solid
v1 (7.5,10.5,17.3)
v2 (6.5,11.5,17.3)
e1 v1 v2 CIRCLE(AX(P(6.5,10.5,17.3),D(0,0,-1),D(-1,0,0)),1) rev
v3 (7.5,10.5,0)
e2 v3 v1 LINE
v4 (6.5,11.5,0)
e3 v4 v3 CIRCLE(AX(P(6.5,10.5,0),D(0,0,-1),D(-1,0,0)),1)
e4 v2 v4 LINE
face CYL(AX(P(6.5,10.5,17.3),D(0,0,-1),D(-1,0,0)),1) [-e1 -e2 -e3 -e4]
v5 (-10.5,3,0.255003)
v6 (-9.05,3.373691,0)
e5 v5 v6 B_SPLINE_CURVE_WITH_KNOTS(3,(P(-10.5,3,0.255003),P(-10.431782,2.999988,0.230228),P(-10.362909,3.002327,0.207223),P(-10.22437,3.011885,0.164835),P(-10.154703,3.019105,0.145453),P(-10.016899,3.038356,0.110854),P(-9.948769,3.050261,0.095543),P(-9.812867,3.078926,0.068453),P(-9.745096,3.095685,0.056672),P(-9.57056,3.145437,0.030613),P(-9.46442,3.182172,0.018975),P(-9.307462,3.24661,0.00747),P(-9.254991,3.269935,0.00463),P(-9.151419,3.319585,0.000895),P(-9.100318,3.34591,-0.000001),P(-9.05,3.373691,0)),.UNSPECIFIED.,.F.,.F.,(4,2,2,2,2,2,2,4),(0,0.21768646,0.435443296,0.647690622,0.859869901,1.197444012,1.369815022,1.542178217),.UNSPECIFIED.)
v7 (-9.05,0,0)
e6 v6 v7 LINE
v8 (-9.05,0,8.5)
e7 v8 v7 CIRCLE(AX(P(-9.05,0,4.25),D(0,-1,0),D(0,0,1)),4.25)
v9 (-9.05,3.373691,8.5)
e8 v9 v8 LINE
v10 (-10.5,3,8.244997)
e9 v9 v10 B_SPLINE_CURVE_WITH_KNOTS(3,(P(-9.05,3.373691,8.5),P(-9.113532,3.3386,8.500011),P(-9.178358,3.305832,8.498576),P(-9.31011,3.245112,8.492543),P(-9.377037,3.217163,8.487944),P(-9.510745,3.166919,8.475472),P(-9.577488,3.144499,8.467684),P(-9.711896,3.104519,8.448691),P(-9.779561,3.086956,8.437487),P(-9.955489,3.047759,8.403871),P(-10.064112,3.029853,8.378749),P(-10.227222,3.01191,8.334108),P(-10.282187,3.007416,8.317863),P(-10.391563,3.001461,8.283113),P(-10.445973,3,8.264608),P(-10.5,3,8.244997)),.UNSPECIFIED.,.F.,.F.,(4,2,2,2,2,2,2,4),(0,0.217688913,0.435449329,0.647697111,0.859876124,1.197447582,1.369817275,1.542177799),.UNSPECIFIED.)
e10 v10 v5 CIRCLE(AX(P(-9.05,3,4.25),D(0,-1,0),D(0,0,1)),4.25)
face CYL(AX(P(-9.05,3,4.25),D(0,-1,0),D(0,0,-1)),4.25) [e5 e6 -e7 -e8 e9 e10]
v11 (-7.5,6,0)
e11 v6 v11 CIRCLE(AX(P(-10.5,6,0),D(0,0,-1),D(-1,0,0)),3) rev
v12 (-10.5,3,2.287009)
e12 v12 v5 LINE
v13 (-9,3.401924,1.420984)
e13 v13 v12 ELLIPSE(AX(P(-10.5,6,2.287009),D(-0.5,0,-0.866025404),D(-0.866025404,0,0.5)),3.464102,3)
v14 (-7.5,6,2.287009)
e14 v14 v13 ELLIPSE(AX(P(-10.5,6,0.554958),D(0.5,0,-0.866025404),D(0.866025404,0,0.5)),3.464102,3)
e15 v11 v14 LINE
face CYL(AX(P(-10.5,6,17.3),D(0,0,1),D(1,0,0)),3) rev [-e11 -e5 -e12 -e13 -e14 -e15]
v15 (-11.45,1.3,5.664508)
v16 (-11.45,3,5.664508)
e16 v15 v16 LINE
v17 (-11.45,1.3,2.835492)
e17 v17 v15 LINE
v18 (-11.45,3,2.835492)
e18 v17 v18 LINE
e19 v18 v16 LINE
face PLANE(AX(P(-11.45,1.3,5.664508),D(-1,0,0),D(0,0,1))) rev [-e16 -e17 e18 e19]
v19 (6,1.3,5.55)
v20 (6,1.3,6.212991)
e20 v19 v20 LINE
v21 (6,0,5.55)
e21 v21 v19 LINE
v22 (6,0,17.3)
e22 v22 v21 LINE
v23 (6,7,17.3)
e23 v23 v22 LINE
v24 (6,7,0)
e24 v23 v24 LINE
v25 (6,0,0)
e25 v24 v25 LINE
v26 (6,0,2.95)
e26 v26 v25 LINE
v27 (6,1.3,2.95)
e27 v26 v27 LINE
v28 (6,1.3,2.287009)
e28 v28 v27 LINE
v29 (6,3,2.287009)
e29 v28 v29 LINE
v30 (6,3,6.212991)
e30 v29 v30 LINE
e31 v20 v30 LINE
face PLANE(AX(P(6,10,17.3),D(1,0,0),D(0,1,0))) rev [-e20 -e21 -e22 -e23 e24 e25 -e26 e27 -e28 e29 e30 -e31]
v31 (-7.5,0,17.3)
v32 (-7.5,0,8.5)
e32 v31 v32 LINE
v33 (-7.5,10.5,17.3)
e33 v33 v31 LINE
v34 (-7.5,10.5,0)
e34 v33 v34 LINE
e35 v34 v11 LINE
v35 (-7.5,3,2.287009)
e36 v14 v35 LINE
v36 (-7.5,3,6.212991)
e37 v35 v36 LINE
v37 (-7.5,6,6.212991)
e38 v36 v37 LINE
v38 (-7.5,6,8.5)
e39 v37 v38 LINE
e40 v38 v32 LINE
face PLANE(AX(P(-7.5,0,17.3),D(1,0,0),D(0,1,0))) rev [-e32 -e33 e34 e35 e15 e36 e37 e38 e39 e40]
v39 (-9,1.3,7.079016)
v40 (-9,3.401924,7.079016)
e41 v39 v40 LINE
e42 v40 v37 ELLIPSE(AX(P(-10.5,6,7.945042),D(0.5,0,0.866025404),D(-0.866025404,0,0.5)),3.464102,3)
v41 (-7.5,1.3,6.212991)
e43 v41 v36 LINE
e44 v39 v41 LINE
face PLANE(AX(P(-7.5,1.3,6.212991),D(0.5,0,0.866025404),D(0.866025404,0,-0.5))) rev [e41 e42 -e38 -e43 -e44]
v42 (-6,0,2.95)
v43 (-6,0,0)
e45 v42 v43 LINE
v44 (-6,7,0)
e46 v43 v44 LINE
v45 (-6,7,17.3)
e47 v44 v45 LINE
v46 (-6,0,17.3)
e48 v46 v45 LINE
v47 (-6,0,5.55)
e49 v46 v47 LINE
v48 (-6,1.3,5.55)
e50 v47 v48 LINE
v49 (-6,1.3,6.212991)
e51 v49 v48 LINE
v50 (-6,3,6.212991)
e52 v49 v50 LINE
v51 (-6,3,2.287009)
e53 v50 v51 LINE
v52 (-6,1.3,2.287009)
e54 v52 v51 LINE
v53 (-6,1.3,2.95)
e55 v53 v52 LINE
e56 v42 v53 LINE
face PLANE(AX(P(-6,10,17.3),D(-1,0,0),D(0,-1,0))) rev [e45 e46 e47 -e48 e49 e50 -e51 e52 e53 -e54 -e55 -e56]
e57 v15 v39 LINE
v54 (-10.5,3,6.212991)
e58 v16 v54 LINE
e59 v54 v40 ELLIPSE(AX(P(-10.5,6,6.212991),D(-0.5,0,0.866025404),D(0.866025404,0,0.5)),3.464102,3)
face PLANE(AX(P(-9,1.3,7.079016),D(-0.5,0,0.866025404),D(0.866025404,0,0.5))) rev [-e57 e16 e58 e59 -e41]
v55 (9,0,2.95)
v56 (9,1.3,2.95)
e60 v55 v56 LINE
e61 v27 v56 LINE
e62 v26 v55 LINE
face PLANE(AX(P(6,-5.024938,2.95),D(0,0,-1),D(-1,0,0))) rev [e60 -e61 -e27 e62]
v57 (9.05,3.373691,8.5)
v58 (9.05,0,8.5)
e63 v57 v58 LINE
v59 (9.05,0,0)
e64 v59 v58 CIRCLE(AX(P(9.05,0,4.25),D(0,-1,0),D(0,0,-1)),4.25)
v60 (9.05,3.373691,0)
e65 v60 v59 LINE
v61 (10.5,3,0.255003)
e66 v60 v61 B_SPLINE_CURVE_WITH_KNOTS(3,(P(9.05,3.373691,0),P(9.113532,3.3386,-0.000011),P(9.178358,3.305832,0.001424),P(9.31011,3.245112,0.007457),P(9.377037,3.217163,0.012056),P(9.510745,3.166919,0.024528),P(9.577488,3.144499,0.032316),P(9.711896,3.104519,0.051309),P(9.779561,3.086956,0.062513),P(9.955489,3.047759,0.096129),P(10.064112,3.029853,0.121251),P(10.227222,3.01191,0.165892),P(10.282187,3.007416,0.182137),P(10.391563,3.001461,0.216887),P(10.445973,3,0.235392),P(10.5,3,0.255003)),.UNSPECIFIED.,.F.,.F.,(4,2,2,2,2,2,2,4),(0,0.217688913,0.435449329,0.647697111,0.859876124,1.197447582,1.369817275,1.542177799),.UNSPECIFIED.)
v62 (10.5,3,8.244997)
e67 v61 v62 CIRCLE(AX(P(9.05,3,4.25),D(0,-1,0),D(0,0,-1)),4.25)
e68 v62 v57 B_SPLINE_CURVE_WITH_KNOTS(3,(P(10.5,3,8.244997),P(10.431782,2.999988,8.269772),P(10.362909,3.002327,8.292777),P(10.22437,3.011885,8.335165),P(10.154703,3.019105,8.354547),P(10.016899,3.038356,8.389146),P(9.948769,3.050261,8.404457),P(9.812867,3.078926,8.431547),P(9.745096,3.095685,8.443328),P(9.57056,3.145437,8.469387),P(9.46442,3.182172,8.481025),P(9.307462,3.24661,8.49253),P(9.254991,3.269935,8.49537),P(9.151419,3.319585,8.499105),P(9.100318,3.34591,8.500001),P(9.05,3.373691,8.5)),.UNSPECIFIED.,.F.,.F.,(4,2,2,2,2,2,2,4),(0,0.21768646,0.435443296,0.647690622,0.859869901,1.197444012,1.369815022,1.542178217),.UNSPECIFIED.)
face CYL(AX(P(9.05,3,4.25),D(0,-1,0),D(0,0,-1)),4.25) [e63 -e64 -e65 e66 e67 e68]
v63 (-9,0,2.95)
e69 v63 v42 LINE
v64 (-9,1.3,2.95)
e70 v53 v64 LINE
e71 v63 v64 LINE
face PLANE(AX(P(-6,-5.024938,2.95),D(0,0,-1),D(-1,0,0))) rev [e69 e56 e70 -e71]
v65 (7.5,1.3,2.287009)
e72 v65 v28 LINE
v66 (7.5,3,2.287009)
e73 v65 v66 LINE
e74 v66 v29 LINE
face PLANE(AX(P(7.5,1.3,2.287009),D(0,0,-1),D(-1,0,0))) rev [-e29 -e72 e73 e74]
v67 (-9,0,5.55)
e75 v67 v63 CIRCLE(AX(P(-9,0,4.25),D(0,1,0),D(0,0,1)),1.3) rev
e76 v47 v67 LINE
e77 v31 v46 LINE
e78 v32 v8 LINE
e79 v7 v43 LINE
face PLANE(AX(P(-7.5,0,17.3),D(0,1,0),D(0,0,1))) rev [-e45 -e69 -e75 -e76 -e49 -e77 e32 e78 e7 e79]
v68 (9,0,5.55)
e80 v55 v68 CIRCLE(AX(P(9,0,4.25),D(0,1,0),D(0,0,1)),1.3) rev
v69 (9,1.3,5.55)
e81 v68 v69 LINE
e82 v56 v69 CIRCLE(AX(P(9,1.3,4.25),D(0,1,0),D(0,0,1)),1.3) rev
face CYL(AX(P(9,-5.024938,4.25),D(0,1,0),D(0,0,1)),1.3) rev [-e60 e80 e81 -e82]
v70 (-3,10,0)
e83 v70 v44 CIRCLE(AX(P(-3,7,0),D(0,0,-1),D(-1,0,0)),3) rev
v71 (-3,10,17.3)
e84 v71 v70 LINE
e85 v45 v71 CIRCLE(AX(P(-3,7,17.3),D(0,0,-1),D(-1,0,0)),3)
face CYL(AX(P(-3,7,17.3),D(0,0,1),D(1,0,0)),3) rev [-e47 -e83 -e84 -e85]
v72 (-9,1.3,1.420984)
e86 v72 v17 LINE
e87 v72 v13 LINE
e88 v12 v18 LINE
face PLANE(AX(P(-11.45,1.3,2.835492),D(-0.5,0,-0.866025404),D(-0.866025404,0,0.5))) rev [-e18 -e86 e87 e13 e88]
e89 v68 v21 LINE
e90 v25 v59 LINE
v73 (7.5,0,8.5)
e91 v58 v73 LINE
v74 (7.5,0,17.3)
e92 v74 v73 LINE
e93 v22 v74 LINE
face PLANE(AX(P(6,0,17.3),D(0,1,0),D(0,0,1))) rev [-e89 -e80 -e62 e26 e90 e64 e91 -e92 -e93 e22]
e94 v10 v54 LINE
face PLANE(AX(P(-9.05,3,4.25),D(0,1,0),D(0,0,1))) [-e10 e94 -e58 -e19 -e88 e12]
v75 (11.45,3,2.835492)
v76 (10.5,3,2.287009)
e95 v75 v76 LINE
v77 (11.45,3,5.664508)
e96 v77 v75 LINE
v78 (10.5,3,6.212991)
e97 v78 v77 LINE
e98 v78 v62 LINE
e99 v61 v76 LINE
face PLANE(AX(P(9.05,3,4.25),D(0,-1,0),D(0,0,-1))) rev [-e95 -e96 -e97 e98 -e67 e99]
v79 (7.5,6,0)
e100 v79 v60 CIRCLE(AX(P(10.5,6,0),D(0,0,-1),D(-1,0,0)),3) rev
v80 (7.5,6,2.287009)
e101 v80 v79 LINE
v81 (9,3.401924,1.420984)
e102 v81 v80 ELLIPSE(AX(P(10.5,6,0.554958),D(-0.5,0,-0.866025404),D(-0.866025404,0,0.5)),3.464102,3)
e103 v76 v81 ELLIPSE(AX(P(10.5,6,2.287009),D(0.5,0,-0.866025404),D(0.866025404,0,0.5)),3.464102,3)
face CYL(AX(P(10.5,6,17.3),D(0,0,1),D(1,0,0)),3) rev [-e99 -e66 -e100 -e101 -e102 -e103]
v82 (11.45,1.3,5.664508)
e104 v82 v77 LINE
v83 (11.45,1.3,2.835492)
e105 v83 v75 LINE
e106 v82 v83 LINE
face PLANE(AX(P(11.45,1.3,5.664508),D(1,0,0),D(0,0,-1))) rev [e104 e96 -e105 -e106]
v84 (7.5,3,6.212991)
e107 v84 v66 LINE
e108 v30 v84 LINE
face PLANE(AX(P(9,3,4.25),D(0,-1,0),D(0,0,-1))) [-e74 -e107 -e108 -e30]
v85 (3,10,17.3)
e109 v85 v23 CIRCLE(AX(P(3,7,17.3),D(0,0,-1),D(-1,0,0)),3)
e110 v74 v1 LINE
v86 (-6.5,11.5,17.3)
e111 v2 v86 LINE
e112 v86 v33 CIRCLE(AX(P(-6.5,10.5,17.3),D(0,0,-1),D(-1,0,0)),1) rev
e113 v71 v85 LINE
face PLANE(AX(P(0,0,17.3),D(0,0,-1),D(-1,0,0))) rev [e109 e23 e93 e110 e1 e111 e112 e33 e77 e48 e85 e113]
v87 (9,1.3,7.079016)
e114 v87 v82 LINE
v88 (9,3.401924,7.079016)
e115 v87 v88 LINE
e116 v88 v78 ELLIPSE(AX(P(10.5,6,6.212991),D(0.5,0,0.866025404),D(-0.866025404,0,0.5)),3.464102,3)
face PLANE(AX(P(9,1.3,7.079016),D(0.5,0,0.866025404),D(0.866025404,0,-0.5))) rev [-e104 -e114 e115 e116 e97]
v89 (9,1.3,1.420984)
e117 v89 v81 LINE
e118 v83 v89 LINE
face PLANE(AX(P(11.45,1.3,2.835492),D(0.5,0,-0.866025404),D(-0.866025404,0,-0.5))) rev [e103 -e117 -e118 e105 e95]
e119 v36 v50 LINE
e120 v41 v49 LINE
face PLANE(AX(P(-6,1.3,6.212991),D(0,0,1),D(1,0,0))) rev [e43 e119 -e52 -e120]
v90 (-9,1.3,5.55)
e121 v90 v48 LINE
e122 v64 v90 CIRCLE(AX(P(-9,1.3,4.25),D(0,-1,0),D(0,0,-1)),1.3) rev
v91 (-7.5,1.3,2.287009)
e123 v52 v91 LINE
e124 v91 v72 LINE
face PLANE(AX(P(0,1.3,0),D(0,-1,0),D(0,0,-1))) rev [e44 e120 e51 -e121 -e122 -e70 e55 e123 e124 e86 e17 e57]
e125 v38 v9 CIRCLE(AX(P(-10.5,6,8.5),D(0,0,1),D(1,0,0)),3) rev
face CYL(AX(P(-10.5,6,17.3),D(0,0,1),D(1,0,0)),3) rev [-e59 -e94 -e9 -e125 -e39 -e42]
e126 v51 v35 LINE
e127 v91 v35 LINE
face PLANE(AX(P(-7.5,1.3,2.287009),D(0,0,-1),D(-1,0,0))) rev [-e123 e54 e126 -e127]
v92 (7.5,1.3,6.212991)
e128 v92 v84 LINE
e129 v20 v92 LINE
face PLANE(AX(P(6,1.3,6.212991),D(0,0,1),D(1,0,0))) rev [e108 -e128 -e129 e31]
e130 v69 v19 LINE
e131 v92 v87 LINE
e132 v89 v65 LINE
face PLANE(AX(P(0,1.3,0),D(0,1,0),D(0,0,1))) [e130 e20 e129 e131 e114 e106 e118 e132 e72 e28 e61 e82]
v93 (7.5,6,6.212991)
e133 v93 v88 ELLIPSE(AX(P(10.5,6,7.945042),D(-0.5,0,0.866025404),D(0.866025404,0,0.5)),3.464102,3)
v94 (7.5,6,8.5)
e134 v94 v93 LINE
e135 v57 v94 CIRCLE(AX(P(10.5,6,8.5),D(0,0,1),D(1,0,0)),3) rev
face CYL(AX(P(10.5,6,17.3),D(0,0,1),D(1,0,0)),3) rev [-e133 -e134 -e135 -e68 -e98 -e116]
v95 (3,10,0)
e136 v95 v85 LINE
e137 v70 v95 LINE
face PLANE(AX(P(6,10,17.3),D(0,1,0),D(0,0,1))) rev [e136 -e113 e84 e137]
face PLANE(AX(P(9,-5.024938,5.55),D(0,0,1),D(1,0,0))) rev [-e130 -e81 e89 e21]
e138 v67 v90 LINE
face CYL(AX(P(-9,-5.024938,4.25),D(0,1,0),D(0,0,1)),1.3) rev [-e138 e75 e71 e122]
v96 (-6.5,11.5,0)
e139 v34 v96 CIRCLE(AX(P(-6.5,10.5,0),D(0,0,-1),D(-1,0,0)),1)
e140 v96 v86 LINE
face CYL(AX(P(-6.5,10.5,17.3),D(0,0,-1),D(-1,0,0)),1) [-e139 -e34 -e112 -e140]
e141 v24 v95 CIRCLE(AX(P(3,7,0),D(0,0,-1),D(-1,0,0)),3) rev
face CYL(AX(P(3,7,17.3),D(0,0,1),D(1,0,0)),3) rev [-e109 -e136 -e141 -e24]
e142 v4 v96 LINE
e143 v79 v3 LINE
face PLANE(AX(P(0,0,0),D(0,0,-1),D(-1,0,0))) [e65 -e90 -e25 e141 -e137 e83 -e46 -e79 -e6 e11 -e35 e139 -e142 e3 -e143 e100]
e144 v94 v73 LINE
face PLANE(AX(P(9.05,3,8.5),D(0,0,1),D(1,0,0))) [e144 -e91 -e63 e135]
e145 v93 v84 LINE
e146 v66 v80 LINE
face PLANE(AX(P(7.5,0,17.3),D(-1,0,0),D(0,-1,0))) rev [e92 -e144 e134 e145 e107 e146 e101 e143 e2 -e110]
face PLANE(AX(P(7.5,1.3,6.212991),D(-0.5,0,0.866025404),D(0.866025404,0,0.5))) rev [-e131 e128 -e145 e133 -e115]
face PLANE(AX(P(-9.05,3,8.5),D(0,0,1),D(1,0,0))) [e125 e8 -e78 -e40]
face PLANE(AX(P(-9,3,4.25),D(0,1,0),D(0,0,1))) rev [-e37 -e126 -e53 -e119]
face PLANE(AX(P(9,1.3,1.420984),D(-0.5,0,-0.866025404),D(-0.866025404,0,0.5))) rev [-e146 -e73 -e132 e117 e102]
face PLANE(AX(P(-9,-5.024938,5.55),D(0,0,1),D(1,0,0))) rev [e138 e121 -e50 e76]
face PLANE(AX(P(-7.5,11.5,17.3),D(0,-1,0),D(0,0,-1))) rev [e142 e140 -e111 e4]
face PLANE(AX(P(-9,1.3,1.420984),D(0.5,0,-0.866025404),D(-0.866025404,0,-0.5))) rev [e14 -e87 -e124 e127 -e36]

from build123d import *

# Parameters (mm, degrees)
BOSS_EXTRUDE1_DEPTH = 17.3
BOSS_EXTRUDE2_DEPTH = 3
CUT_EXTRUDE1_DEPTH  = 3
CUT_EXTRUDE2_DEPTH  = 1.7
FILLET1_DEPTH       = 17.3
FILLET1_START       = 6.212990815
FILLET1_2_DEPTH     = 2.287009185
FILLET1_3_DEPTH     = 2.287009085
FILLET1_START_2     = 3
FILLET1_4_DEPTH     = 8.5
FILLET2_R           = 1


with BuildPart() as part:
    # Sketch1 → Boss-Extrude1 (new body)
    with BuildSketch(Plane.XY):
        Polygon((6, 0), (7.5, 0), (7.5, 11.5), (-7.5, 11.5), (-7.5, 0), (-6, 0), (-6, 10), (6, 10), align=None)
    extrude(amount=BOSS_EXTRUDE1_DEPTH)

    # Sketch2 → Boss-Extrude2 (add)
    with BuildSketch(Plane.XZ):
        with BuildLine():
            Line((-7.5, 0), (-9.05, 0))
            ThreePointArc((-9.05, 0), (-13.3, 4.25), (-9.05, 8.5))
            Line((-9.05, 8.5), (-7.5, 8.5))
            Line((-7.5, 8.5), (-7.5, 0))
        make_face()
        with BuildLine():
            Line((7.5, 0), (9.05, 0))
            ThreePointArc((9.05, 0), (13.3, 4.25), (9.05, 8.5))
            Line((9.05, 8.5), (7.5, 8.5))
            Line((7.5, 8.5), (7.5, 0))
        make_face()
    extrude(amount=-BOSS_EXTRUDE2_DEPTH)

    # Sketch3 → Cut-Extrude1 (cut)
    with BuildSketch(Plane(origin=(0, 3, 0), x_dir=(1, 0, 0), z_dir=(0, 1, 0))):
        with BuildLine():
            Line((6, -2.95), (9, -2.95))
            ThreePointArc((9, -2.95), (10.3, -4.25), (9, -5.55))
            Line((9, -5.55), (6, -5.55))
            Line((6, -5.55), (6, -2.95))
        make_face()
        with BuildLine():
            Line((-6, -2.95), (-9, -2.95))
            ThreePointArc((-9, -2.95), (-10.3, -4.25), (-9, -5.55))
            Line((-9, -5.55), (-6, -5.55))
            Line((-6, -5.55), (-6, -2.95))
        make_face()
    extrude(amount=-CUT_EXTRUDE1_DEPTH, mode=Mode.SUBTRACT)

    # Sketch4 → Cut-Extrude2 (cut)
    with BuildSketch(Plane(origin=(0, 3, 0), x_dir=(1, 0, 0), z_dir=(0, 1, 0))):
        Polygon((9, -1.420983681), (7.5, -2.287009085), (6, -2.287009085), (6, -6.212990915), (7.5, -6.212990915), (9, -7.079016319), (11.45, -5.66450816), (11.45, -2.83549184), align=None)
        Polygon((-6, -6.212990915), (-7.5, -6.212990915), (-9, -7.079016319), (-11.45, -5.66450816), (-11.45, -2.83549184), (-9, -1.420983681), (-7.5, -2.287009085), (-6, -2.287009085), align=None)
    extrude(amount=-CUT_EXTRUDE2_DEPTH, mode=Mode.SUBTRACT)

    # Fillet1: read off the stored shape, not the designer's step
    # Fillet1 outline → Fillet1 (add)
    with BuildSketch(Plane.XY):
        with BuildLine():
            Line((6, 10), (3, 10))
            ThreePointArc((3, 10), (5.121320344, 9.121320344), (6, 7))
            Line((6, 7), (6, 10))
        make_face()
        with BuildLine():
            ThreePointArc((-6, 7), (-5.121320344, 9.121320344), (-3, 10))
            Line((-3, 10), (-6, 10))
            Line((-6, 10), (-6, 7))
        make_face()
    extrude(amount=FILLET1_DEPTH)

    # Fillet1 2 outline → Fillet1 2 (add)
    with BuildSketch(Plane.XY.offset(FILLET1_START)):
        with BuildLine():
            ThreePointArc((-7.5, 6), (-8.378679656, 3.878679656), (-10.5, 3))
            Line((-10.5, 3), (-7.5, 3))
            Line((-7.5, 3), (-7.5, 6))
        make_face()
        with BuildLine():
            ThreePointArc((10.5, 3), (8.378679656, 3.878679656), (7.5, 6))
            Line((7.5, 6), (7.5, 3))
            Line((7.5, 3), (10.5, 3))
        make_face()
    extrude(amount=FILLET1_2_DEPTH)

    # Fillet1 3 outline → Fillet1 3 (add)
    with BuildSketch(Plane.XY):
        with BuildLine():
            ThreePointArc((-7.5, 6), (-8.378679656, 3.878679656), (-10.5, 3))
            Line((-10.5, 3), (-7.5, 3))
            Line((-7.5, 3), (-7.5, 6))
        make_face()
        with BuildLine():
            ThreePointArc((10.5, 3), (8.378679656, 3.878679656), (7.5, 6))
            Line((7.5, 6), (7.5, 3))
            Line((7.5, 3), (10.5, 3))
        make_face()
    extrude(amount=FILLET1_3_DEPTH)

    # Fillet1 4 outline → Fillet1 4 (cut)
    with BuildSketch(Plane(origin=(0, 0, 0), x_dir=(1, 0, 0), z_dir=(0, 1, 0)).offset(FILLET1_START_2)):
        Polygon((9, -1.420983681), (7.5, -2.287009085), (10.5, -2.287009085), align=None)
        Polygon((10.5, -6.212990815), (7.5, -6.212990815), (9, -7.079016319), align=None)
        with BuildLine():
            Line((10.5, 0), (9.05, 0))
            ThreePointArc((9.05, 0), (9.786126109, -0.064236228), (10.5, -0.255003129))
            Line((10.5, -0.255003129), (10.5, 0))
        make_face()
        with BuildLine():
            ThreePointArc((10.5, -8.244996871), (9.786126109, -8.435763772), (9.05, -8.5))
            Line((9.05, -8.5), (10.5, -8.5))
            Line((10.5, -8.5), (10.5, -8.244996871))
        make_face()
        with BuildLine():
            Line((-9.05, 0), (-10.5, 0))
            Line((-10.5, 0), (-10.5, -0.255003129))
            ThreePointArc((-10.5, -0.255003129), (-9.786126109, -0.064236228), (-9.05, 0))
        make_face()
        with BuildLine():
            ThreePointArc((-9.05, -8.5), (-9.786126109, -8.435763772), (-10.5, -8.244996871))
            Line((-10.5, -8.244996871), (-10.5, -8.5))
            Line((-10.5, -8.5), (-9.05, -8.5))
        make_face()
        Polygon((-9, -1.420983681), (-10.5, -2.287009085), (-7.5, -2.287009085), align=None)
        Polygon((-7.5, -6.212990815), (-10.5, -6.212990815), (-9, -7.079016319), align=None)
    extrude(amount=FILLET1_4_DEPTH, mode=Mode.SUBTRACT)

    # Fillet2
    fillet2_edges = [part.edges().sort_by_distance(p)[0] for p in [
        (-7.5, 11.5, 8.65),
        (7.5, 11.5, 8.65),
    ]]
    fillet(fillet2_edges, radius=FILLET2_R)


solid = part.part
